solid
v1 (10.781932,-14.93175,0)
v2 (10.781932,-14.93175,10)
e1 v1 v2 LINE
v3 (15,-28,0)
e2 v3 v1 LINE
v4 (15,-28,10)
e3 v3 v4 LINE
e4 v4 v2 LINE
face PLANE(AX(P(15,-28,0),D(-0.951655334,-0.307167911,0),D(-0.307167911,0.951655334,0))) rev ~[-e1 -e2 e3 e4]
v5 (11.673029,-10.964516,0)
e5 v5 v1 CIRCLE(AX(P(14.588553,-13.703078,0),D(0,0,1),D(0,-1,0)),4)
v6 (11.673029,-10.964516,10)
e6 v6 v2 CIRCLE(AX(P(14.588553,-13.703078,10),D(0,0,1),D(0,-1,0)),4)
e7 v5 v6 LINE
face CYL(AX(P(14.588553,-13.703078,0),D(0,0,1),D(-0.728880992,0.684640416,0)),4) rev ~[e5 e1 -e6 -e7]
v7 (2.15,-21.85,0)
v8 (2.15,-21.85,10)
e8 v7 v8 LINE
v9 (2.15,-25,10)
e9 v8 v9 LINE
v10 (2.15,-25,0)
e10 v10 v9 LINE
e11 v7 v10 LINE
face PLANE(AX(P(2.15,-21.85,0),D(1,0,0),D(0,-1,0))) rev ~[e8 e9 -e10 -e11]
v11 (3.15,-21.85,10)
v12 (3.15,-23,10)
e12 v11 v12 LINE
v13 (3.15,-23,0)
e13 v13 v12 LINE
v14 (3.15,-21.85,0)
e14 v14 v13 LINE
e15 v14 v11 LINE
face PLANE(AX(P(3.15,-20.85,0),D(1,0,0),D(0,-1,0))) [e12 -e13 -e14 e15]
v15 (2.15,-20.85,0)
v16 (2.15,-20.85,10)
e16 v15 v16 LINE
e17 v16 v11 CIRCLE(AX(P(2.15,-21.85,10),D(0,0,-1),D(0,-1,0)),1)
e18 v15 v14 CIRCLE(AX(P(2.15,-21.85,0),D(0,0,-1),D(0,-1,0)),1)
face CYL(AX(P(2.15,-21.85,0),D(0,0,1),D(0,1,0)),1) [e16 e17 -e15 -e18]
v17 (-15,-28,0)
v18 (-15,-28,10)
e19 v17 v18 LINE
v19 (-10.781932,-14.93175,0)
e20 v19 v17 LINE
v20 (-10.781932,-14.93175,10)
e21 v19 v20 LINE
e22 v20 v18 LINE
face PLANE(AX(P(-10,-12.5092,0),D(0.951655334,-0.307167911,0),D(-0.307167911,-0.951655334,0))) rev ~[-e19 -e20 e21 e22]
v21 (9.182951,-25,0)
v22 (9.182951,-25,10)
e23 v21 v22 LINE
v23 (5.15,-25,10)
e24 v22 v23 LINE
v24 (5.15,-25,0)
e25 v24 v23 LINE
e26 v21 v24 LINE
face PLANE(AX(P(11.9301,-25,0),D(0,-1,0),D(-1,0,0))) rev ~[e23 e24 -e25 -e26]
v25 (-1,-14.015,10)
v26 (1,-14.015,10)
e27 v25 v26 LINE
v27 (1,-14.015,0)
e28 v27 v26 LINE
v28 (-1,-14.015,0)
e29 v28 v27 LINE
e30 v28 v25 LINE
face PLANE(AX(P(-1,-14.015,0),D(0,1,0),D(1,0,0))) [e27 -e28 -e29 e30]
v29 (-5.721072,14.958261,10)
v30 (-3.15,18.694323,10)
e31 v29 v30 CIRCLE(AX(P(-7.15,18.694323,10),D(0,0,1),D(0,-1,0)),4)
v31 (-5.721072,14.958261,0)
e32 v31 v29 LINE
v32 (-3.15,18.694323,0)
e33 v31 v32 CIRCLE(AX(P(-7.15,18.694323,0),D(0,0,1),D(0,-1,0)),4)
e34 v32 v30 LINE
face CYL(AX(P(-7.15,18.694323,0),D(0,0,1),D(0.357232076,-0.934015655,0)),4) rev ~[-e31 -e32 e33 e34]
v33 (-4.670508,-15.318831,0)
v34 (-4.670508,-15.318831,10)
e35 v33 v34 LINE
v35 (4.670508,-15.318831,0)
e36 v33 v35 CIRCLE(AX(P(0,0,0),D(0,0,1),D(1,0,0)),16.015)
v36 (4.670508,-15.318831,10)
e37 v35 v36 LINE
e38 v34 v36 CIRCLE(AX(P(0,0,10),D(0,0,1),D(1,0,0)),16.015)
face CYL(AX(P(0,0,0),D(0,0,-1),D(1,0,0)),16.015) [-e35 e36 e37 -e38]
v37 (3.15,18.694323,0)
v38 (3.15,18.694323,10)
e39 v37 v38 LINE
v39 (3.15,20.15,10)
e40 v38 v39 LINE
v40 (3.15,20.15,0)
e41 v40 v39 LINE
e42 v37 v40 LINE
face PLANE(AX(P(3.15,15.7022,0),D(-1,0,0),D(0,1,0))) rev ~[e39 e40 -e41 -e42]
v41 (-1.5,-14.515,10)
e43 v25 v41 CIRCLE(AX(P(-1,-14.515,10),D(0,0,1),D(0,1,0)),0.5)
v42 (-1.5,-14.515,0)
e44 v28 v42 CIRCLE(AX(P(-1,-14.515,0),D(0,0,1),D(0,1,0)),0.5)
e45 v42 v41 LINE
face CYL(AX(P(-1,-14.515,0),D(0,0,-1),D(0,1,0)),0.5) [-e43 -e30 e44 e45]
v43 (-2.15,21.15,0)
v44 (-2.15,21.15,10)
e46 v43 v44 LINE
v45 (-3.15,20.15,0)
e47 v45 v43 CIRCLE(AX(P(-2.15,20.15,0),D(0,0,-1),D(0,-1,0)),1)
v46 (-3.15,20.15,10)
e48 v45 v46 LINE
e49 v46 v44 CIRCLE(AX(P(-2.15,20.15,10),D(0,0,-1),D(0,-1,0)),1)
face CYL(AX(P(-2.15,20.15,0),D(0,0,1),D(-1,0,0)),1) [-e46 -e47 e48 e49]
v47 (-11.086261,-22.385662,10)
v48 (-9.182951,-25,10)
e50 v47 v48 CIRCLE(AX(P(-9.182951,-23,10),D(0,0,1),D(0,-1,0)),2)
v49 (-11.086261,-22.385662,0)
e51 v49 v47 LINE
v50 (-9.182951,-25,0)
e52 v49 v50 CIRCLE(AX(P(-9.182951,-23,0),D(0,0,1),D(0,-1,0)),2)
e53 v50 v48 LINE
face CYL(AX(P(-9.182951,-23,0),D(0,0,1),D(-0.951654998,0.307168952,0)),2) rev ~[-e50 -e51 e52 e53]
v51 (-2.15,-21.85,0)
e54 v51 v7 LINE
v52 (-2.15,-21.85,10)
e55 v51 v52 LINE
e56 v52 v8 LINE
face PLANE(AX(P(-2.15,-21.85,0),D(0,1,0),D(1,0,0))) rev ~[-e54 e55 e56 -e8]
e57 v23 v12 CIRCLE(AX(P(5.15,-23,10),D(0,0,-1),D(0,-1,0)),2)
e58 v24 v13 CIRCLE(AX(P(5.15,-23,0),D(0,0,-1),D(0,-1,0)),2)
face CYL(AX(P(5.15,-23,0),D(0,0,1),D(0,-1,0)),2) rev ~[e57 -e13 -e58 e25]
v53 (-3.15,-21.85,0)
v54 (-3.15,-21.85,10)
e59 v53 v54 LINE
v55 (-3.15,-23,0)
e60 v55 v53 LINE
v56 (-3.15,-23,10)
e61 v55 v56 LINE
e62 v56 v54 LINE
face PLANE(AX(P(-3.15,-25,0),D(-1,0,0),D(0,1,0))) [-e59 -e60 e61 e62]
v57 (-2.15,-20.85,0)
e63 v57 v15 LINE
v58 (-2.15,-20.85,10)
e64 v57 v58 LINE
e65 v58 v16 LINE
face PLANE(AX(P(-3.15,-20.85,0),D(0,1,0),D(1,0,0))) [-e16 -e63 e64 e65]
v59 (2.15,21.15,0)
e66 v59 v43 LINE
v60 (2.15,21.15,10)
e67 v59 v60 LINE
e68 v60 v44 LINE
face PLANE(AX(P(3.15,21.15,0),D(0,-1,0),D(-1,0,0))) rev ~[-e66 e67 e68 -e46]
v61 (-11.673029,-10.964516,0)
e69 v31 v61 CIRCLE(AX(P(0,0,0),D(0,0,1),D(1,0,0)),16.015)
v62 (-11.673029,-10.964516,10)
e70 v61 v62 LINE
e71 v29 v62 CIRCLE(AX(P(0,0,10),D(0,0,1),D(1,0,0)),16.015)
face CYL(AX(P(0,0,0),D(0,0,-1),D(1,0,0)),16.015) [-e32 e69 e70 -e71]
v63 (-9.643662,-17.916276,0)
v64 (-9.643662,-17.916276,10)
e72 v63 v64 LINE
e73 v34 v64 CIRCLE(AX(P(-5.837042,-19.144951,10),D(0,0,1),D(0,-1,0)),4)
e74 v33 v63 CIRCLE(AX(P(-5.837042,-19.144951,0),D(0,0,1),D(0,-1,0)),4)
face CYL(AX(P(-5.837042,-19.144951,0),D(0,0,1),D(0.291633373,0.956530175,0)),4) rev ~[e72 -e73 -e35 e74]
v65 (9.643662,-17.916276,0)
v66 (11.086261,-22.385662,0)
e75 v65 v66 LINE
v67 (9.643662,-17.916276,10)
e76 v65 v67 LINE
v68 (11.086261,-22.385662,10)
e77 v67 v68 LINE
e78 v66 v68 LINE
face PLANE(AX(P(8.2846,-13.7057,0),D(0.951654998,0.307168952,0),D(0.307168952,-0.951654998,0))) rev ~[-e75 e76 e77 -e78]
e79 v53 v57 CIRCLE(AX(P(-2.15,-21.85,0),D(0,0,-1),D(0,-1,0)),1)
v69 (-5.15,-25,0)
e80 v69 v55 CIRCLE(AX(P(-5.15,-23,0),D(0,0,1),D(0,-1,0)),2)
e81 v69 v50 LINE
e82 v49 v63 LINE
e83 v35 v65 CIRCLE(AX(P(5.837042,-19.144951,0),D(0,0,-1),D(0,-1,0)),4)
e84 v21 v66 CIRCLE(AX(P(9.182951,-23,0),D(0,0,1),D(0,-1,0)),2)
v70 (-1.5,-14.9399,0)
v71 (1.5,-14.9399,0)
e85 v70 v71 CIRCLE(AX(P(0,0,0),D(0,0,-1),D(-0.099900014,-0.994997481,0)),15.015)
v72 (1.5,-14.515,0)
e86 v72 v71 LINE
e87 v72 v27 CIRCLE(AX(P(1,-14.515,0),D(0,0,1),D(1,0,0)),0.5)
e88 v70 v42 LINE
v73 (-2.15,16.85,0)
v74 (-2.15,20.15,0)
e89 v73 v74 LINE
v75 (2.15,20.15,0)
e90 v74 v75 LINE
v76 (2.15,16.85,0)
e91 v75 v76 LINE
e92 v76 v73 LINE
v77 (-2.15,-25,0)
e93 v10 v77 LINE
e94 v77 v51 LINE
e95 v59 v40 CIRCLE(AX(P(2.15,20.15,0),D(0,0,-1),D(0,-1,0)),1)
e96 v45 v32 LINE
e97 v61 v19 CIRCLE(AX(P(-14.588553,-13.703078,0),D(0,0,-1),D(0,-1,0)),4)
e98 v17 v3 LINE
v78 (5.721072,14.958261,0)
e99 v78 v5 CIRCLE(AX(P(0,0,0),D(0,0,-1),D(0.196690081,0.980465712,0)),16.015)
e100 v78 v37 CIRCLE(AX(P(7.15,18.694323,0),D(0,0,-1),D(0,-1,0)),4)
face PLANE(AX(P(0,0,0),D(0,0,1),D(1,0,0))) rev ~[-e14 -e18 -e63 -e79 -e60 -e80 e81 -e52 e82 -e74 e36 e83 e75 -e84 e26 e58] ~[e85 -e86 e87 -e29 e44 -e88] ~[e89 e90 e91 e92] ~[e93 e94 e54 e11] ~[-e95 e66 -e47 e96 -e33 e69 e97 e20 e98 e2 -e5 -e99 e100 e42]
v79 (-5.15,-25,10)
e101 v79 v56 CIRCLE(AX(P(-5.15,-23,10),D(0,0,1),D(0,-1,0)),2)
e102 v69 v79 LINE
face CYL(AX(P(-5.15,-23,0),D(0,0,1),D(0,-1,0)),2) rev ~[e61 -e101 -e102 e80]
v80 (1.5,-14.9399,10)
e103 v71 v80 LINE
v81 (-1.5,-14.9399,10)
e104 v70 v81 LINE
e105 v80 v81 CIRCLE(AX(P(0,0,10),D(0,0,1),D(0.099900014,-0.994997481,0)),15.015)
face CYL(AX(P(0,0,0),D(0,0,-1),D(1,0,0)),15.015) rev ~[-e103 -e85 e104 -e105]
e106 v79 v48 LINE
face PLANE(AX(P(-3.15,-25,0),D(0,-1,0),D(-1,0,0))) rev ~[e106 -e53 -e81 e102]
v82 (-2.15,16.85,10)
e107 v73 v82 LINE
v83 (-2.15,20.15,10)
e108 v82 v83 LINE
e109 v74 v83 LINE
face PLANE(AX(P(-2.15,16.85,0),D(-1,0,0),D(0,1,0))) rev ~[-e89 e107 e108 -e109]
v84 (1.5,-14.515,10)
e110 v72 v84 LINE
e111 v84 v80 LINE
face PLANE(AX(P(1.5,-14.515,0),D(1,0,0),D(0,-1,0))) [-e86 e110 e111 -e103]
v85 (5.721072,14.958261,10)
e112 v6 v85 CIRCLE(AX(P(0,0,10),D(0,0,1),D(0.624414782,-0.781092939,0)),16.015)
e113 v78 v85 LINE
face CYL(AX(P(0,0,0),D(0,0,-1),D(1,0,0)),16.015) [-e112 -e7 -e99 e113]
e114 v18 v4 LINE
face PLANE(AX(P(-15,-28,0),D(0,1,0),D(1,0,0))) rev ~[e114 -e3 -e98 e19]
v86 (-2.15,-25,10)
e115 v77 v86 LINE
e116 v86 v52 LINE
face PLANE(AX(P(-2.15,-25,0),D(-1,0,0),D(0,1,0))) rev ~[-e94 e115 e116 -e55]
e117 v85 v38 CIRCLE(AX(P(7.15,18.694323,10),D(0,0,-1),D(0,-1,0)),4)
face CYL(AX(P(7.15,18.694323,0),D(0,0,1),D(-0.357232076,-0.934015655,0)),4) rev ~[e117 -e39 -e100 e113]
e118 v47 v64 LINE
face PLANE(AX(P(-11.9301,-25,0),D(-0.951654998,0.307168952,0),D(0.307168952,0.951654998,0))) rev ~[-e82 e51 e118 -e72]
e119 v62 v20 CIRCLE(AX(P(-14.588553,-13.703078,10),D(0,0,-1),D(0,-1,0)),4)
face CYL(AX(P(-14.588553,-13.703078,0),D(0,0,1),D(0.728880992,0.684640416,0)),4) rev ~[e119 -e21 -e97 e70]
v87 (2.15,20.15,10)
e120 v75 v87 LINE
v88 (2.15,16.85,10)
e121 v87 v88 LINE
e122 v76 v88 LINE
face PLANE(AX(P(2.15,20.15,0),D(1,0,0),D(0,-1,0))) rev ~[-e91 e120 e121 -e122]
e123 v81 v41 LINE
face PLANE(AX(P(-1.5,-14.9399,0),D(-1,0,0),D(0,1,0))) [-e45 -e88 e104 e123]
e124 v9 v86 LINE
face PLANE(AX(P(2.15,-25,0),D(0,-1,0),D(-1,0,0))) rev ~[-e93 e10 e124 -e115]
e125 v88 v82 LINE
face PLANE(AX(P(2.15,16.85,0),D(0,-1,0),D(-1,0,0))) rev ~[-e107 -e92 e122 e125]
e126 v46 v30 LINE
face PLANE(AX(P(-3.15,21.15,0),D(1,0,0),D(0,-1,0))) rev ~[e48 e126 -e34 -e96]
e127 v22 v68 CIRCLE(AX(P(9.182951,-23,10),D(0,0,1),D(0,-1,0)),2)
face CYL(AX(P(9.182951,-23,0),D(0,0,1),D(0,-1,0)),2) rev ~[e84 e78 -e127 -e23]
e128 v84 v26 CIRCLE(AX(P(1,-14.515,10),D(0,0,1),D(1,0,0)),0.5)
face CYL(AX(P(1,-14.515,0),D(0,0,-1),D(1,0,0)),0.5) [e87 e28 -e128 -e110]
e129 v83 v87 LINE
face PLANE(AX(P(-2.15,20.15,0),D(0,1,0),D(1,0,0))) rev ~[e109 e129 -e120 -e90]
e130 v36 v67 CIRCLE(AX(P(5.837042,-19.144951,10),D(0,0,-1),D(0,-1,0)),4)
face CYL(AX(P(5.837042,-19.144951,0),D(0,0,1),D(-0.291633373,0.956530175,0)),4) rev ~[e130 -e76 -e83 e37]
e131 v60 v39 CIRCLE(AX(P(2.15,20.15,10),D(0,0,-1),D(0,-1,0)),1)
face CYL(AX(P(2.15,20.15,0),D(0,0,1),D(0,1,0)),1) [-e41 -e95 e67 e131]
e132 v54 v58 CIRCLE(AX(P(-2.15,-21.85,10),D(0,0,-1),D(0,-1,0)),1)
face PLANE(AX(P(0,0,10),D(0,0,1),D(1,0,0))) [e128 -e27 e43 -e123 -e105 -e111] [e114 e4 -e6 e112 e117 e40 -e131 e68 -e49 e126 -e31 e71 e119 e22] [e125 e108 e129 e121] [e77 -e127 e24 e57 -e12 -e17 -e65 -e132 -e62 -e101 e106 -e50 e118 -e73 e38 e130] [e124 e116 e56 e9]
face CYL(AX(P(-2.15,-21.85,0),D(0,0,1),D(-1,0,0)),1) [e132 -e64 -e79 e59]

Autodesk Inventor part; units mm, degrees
ref_plane "YZ Plane" through (0, 0, 0) normal (1, 0, 0) x (0, 1, 0)
ref_plane "XZ Plane" through (0, 0, 0) normal (0, 1, 0) x (-1, 0, 0)
ref_plane "XY Plane" through (0, 0, 0) normal (0, 0, 1) x (1, 0, 0)
sketch "Sketch1" plane through (0, 0, 0) normal (0, 0, 1) x (1, 0, 0)
  circle A0 centre (0, 0) radius 15.015
  circle A1 centre (0, 0) radius 16.015
  line L0 (-10, -12.5092) -> (-15, -28)
  line L1 (-15, -28) -> (15, -28)
  line L2 (15, -28) -> (10, -12.5092)
  line L3 (8.2846, -13.7057) -> (11.9301, -25)
  line L4 (11.9301, -25) -> (3.15, -25)
  line L5 (-11.9301, -25) -> (-8.2846, -13.7057)
  line L6 (-1.5, -14.9399) -> (-1.5, -14.515)
  line L7 (-1, -14.015) -> (1, -14.015)
  line L8 (1.5, -14.515) -> (1.5, -14.9399)
  arc A2 (-1, -14.015) -> (-1.5, -14.515) centre (-1, -14.515) ccw
  arc A3 (1.5, -14.515) -> (1, -14.015) centre (1, -14.515) ccw
  line L9 (2, -25) -> (2, -22) construction
  line L10 (2, -22) -> (-2, -22) construction
  line L11 (-2, -22) -> (-2, -25) construction
  line L12 (-2.15, -25) -> (-2.15, -21.85)
  line L13 (-2.15, -21.85) -> (2.15, -21.85)
  line L14 (2.15, -21.85) -> (2.15, -25)
  line L15 (-3.15, -25) -> (-3.15, -20.85)
  line L16 (-3.15, -20.85) -> (3.15, -20.85)
  line L17 (3.15, -20.85) -> (3.15, -25)
  line L18 (3.15, -25) -> (2.15, -25)
  line L19 (2.15, -25) -> (-2.15, -25)
  line L20 (-2.15, -25) -> (-3.15, -25)
  line L21 (-3.15, -25) -> (-11.9301, -25)
  line L22 (2, 20) -> (-2, 20) construction
  line L23 (-2, 20) -> (-2, 17) construction
  line L24 (-2, 17) -> (2, 17) construction
  line L25 (2, 17) -> (2, 20) construction
  line L26 (-2.15, 16.85) -> (-2.15, 20.15)
  line L27 (-2.15, 20.15) -> (2.15, 20.15)
  line L28 (2.15, 20.15) -> (2.15, 16.85)
  line L29 (2.15, 16.85) -> (-2.15, 16.85)
  line L30 (3.15, 15.7022) -> (3.15, 21.15)
  line L31 (3.15, 21.15) -> (-3.15, 21.15)
  line L32 (-3.15, 21.15) -> (-3.15, 15.7022)
  point P0 (0, -28)
  point P1 (-1.5, -14.015)
  point P2 (1.5, -14.015)
  point P3 (0, -14.015)
  point P4 (0, -15.015)
  point P5 (0, -22)
  point P6 (0, -25)
  point P7 (0, -25)
  point P8 (0, 17)
  dimension "d0" = 28
  dimension "d1" = 1
  dimension "d2" = 30
  dimension "d3" = 30.03
  dimension "d4" = 20
  dimension "d5" = 3
  dimension "d6" = 2
  dimension "d10" = 3
  dimension "d12" = 1
  dimension "d13" = 0.5
  dimension "d14" = 3
  dimension "d15" = 4
  dimension "d16" = 0.15
  dimension "d17" = 1
  dimension "d21" = 4
  dimension "d22" = 3
  dimension "d23" = 17
  dimension "d24" = 0.15
  dimension "d25" = 1
  dimension "d26" = 1
  dimension "d27" = 1
extrude "Extrusion1" add sketch "Sketch1" along normal blind 10 contours L6 A2 L7 A3 L8 A0 | A1 | A1 L32 L31 L30 | L2 L1 L0 A1 L5 L21 L20 L19 L18 L4 L3 | L18 L14 L13 L12 L20 L15 L16 L17 picked at (0.1669, -14.3455)
fillet "Fillet1" radius 4 6 edges at (10, -12.5092, 5) (8.2846, -13.7057, 5) (-8.2846, -13.7057, 5) (-10, -12.5092, 5) (3.15, 15.7022, 5) (-3.15, 15.7022, 5)
fillet "Fillet1" radius 2 4 edges at (11.9301, -25, 5) (-11.9301, -25, 5) (-3.15, -25, 5) (3.15, -25, 5)
fillet "Fillet1" radius 1 4 edges at (3.15, -20.85, 5) (-3.15, -20.85, 5) (3.15, 21.15, 5) (-3.15, 21.15, 5)
properties part number "Motor Reversed Mount Midsection" material "ABS Plastic"
